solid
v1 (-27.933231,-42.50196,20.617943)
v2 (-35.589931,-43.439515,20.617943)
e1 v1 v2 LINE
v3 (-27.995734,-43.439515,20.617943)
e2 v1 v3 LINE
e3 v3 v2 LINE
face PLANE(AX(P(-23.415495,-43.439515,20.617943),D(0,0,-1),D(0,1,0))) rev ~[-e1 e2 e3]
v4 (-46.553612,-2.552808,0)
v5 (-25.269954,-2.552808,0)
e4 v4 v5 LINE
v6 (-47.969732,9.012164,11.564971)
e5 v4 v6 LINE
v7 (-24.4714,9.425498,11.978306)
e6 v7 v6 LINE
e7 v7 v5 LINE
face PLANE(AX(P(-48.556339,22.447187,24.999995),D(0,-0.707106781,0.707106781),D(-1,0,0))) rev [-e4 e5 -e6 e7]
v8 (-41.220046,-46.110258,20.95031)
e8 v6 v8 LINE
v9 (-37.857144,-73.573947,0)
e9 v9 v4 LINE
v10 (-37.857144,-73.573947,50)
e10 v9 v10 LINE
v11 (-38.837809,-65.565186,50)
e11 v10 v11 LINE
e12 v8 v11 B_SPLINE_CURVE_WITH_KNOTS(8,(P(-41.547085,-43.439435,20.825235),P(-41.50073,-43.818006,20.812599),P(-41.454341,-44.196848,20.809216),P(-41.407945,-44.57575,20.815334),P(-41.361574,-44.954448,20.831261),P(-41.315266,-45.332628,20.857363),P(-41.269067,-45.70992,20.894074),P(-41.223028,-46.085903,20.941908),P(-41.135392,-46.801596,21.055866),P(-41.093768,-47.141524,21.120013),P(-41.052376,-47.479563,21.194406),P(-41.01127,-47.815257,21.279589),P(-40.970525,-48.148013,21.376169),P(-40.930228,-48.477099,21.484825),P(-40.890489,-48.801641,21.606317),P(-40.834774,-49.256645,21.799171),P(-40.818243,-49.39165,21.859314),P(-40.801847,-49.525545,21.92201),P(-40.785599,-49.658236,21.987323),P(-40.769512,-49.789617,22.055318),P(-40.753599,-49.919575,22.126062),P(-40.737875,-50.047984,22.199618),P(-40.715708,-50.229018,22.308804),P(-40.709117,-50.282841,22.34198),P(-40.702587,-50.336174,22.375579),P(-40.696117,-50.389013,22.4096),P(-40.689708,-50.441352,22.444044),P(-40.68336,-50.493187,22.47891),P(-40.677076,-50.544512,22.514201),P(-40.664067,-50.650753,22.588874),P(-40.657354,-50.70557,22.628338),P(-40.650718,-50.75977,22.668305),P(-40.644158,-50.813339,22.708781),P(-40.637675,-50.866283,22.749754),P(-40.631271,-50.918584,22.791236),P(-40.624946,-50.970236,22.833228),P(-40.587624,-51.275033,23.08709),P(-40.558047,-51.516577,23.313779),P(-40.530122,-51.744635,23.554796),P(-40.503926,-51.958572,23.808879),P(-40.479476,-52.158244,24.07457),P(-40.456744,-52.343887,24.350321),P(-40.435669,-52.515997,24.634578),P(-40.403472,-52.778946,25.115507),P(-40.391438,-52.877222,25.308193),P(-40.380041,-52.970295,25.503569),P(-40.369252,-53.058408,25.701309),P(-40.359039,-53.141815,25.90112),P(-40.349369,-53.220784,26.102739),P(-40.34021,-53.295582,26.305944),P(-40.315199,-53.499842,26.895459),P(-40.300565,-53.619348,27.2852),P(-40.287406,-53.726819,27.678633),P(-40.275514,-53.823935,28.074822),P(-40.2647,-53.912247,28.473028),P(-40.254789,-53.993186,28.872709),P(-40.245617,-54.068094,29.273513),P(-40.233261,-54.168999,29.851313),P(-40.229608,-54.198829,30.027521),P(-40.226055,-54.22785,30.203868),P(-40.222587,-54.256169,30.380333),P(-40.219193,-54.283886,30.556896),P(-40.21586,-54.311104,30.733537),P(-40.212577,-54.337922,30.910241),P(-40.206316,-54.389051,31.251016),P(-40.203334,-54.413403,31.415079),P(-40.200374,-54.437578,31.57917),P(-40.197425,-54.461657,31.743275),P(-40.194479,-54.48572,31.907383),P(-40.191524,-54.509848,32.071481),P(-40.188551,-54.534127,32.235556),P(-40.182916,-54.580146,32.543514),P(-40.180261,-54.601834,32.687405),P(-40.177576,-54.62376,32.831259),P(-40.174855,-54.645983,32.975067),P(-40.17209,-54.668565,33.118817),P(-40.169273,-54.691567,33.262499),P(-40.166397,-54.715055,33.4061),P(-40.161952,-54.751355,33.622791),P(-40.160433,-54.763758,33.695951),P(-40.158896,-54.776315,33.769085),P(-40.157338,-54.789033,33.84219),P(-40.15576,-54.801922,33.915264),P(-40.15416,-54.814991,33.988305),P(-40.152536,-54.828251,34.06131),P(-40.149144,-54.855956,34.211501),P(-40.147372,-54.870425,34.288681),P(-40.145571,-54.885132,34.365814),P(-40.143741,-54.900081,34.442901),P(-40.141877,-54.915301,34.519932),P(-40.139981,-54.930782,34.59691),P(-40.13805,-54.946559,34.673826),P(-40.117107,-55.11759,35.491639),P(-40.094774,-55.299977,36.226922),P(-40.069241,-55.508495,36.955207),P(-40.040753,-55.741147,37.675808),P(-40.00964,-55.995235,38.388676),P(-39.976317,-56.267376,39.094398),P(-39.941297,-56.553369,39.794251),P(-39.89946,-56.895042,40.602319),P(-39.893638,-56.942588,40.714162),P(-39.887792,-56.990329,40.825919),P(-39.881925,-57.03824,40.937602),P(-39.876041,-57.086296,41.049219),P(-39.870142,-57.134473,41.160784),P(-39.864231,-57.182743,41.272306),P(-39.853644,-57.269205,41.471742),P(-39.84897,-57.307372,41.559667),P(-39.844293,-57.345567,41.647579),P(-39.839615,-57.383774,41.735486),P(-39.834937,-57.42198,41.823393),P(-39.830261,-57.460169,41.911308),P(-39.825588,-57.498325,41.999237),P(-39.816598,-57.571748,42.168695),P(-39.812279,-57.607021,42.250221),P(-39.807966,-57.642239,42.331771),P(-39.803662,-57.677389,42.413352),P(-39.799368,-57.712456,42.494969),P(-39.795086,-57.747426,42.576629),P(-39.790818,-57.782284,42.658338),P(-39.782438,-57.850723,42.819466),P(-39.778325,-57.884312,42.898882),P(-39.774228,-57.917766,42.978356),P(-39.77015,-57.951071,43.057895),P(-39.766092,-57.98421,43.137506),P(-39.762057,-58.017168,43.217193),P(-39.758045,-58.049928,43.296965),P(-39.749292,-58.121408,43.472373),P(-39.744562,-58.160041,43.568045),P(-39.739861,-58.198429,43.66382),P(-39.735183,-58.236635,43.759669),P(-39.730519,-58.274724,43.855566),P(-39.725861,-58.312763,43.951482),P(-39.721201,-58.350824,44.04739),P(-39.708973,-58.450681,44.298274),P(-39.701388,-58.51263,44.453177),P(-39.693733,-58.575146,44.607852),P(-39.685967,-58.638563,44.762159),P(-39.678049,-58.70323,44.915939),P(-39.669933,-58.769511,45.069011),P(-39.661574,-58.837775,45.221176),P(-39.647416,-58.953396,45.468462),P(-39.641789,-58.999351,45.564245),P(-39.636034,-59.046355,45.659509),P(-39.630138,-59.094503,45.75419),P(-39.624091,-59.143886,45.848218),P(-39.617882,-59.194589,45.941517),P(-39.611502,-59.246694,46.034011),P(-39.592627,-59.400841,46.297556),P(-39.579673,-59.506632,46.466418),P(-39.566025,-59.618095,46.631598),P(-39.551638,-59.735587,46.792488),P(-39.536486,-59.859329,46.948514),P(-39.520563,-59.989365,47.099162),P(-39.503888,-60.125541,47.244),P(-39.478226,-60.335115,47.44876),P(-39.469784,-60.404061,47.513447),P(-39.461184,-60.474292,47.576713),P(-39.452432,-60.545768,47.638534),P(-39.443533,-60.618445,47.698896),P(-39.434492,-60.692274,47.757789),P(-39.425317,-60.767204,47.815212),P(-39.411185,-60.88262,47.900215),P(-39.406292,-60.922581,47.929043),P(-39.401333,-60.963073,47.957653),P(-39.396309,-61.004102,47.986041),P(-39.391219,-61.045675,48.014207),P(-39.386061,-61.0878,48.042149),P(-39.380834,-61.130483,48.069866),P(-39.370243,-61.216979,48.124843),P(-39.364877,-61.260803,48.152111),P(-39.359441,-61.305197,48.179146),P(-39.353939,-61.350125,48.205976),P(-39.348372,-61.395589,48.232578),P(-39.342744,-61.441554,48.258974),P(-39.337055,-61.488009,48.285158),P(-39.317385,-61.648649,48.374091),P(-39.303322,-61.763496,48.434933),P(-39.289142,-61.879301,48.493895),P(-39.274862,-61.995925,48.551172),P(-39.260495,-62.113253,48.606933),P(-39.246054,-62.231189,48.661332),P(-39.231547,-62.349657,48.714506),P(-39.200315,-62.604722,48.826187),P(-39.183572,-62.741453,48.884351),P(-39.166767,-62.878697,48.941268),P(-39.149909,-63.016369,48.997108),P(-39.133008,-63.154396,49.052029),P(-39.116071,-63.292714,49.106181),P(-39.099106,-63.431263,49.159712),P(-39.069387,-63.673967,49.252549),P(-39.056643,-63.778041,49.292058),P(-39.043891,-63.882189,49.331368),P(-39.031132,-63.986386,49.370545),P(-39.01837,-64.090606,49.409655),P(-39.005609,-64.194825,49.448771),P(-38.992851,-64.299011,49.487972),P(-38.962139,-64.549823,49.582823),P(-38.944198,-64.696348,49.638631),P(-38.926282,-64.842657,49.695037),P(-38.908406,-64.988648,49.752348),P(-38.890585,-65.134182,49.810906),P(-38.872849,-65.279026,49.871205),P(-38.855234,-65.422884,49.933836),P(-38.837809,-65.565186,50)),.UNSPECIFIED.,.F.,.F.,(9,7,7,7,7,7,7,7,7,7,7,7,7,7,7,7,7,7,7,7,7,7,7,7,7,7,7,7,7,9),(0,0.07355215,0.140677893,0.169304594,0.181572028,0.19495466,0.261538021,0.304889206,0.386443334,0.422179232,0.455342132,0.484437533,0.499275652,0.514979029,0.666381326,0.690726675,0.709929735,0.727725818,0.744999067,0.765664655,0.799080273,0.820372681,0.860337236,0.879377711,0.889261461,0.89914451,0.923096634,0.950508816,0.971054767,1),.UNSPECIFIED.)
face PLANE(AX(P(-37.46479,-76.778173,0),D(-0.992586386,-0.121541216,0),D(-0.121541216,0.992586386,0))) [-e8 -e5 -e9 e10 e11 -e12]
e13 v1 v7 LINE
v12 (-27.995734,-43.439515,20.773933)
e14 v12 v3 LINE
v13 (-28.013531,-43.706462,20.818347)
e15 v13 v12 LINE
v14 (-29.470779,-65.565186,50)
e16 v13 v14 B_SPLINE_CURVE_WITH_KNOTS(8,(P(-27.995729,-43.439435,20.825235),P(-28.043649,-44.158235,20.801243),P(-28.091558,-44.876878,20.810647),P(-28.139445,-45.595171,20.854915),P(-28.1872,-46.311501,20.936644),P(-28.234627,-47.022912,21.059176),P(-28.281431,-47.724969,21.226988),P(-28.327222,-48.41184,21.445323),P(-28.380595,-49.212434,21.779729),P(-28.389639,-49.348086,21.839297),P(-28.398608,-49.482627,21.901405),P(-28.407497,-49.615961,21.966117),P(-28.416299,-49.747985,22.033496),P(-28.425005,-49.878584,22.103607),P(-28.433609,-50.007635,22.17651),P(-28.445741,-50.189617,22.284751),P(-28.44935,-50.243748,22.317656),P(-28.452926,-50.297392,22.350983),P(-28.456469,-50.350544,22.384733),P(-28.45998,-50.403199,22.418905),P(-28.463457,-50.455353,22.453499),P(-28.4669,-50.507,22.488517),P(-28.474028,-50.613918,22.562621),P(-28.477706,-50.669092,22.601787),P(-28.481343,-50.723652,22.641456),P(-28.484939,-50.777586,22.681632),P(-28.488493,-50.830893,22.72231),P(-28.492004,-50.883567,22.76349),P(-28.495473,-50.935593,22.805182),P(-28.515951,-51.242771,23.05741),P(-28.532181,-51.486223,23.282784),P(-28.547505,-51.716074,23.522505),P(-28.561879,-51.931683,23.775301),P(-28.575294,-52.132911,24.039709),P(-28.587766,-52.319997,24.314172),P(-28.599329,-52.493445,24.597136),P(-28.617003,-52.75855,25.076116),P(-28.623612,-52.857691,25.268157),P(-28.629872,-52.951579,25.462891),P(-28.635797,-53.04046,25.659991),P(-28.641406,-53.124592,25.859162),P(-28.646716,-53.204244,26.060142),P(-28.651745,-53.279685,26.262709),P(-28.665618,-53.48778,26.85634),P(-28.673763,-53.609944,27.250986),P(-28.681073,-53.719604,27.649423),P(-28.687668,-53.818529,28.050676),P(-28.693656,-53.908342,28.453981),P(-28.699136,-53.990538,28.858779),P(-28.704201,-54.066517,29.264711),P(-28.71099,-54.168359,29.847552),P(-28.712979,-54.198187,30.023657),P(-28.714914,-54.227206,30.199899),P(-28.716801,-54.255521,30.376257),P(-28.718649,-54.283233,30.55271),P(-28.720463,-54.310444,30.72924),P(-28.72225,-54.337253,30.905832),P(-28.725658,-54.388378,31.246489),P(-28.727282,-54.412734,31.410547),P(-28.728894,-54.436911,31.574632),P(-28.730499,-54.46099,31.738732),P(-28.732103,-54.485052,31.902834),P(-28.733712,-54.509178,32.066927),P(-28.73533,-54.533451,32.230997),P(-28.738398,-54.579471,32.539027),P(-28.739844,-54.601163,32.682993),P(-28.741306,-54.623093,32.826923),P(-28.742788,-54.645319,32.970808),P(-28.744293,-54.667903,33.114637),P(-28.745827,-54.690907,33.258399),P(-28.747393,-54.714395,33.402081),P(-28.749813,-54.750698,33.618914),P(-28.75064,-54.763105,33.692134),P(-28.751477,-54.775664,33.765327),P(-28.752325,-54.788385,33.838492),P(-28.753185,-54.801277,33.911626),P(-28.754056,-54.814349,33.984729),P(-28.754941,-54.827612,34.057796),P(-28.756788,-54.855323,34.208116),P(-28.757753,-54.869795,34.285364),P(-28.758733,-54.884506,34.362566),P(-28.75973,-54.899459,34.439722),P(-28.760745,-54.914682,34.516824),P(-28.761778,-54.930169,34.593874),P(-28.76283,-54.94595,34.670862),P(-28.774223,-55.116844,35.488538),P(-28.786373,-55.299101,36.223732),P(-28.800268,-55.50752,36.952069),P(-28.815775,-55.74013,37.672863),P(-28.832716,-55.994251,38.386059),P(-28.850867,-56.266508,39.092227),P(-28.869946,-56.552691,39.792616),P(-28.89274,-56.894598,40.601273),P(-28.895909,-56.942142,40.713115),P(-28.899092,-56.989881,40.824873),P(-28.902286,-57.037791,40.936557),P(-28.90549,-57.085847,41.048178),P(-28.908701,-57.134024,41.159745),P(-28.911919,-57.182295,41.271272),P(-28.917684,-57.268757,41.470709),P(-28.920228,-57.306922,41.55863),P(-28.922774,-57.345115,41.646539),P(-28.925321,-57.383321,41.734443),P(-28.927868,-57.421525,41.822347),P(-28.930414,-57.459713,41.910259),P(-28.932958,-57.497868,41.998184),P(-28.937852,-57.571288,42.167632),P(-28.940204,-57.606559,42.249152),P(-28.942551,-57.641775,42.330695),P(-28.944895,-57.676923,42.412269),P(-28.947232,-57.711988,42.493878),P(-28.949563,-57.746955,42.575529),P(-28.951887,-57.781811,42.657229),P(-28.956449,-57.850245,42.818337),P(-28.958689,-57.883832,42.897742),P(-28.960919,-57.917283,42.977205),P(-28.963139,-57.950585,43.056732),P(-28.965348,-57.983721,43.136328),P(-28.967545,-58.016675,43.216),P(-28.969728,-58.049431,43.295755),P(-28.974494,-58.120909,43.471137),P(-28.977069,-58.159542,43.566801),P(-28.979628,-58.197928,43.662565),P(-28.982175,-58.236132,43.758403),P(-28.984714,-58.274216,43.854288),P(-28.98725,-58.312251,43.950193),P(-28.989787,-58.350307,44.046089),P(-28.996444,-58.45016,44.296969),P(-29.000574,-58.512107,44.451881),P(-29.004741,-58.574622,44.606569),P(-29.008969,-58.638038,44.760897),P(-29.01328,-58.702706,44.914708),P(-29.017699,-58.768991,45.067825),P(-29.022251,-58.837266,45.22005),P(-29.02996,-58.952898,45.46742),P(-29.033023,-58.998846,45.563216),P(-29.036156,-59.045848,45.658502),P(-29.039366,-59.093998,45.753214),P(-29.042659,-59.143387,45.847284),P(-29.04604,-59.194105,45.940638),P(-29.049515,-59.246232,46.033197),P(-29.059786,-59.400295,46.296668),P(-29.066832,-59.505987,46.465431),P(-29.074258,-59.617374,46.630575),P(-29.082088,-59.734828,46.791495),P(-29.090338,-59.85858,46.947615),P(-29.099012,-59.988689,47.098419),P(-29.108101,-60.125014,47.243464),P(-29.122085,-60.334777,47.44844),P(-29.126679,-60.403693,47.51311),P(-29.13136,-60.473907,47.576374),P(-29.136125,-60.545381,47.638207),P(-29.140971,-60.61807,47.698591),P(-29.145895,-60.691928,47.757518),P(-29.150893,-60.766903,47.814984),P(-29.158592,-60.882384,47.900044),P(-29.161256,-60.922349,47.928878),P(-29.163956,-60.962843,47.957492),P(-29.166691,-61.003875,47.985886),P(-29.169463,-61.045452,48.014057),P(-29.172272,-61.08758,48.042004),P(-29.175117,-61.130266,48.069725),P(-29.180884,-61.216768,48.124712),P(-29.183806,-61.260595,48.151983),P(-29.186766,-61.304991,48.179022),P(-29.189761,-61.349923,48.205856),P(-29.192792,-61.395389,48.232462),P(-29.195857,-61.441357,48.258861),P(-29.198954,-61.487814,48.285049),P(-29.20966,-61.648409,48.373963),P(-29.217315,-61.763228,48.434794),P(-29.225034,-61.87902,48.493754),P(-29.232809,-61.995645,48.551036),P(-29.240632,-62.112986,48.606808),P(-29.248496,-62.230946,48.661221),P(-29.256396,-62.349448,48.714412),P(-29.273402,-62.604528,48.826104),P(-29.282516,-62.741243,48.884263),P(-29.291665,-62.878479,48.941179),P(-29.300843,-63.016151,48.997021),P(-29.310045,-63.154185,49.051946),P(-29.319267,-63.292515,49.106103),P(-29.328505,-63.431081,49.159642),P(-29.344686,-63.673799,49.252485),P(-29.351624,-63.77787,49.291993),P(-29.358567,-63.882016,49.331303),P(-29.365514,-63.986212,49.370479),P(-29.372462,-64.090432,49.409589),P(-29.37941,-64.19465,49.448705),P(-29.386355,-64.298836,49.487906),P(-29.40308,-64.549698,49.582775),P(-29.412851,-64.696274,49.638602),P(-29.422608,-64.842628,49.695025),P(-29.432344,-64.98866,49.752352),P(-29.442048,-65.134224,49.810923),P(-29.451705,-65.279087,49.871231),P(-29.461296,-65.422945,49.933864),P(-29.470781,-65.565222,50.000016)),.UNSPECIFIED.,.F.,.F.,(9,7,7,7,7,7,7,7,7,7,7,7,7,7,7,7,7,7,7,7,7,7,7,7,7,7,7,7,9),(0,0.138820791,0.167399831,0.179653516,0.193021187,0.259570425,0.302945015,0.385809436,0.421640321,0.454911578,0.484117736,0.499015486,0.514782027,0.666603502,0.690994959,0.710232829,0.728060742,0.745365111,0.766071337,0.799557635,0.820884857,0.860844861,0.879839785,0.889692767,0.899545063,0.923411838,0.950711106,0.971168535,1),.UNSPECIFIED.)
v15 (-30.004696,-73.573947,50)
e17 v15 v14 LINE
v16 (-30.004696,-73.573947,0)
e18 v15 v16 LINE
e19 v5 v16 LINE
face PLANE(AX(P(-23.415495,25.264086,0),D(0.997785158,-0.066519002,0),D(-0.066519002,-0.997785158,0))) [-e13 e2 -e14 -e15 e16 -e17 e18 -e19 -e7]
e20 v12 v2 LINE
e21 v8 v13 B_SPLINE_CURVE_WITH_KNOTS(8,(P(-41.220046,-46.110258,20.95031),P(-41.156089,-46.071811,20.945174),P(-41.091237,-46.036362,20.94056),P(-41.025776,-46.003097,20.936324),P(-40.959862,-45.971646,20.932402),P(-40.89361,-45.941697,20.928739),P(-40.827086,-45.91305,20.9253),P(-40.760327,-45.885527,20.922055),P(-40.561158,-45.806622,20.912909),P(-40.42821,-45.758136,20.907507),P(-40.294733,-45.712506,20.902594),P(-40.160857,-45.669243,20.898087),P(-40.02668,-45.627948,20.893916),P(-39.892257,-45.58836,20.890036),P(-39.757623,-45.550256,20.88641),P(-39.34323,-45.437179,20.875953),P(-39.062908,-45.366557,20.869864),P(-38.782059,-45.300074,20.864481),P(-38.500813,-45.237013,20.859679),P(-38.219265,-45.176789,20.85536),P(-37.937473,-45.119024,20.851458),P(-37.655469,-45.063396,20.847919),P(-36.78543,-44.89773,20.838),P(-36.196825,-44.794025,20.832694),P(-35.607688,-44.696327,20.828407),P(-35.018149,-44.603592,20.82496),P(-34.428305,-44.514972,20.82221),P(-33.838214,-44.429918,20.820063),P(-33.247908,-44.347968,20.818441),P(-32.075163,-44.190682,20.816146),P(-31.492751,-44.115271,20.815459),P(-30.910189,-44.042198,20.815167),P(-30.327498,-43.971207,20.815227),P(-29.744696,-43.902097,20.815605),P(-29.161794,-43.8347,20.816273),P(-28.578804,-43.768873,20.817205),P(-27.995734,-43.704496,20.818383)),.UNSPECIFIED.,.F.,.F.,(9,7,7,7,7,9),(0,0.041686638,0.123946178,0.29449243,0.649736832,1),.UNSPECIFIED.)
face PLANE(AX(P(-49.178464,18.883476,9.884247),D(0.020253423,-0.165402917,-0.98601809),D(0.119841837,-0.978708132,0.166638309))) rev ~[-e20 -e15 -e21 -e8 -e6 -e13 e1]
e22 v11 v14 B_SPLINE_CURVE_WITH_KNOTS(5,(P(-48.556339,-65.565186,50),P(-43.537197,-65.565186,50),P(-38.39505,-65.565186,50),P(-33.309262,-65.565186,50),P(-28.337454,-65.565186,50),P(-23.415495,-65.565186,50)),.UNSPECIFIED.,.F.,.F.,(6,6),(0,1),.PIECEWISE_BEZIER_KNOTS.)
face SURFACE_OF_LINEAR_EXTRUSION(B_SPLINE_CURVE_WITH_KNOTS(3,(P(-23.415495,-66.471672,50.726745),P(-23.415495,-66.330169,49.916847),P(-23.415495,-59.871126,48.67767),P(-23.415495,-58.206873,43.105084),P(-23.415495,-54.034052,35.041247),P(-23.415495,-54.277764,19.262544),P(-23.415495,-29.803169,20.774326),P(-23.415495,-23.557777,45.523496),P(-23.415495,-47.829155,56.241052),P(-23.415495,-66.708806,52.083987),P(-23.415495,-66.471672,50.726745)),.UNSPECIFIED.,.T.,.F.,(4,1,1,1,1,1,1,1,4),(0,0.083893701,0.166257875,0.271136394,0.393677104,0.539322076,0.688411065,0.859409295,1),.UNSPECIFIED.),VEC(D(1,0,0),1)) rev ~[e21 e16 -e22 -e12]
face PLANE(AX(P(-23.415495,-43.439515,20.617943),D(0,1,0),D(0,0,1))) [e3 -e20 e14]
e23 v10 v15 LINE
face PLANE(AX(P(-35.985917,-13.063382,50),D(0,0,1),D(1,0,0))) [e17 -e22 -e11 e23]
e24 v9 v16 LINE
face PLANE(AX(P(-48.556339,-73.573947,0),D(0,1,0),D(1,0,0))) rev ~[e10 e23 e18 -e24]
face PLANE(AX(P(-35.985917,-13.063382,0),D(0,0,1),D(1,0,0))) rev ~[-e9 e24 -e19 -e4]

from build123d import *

# Parameters (mm, degrees)
F0_W      = 25.1408442855
F0_H      = 121.0211291909
F1_DEPTH  = 50
F2_SIZE   = 49.99999
F3_W      = 91.4516113698
F3_H      = 29.3820567429
F4_DEPTH  = 26
F7_DEPTH  = 26
F9_DEPTH  = 50
F11_DEPTH = 55
F13_DEPTH = 25


# Not quite as in the source:
# - a fillet or chamfer is up to 0.001 mm smaller than in the source, because OpenCascade refuses the exact size


with BuildPart() as f1:
    # F0 (on Top) → F1 (new body)
    with BuildSketch(Plane.XY):
        with Locations((-35.985916853, -13.0633823574)):
            Rectangle(F0_W, F0_H)
    extrude(amount=F1_DEPTH)

    # F2 (size 50 in the source; OpenCascade refuses exactly that, so slightly less here)
    f2_edges = [f1.edges().sort_by_distance(p)[0] for p in [
        (-35.985917, 47.447182, 0),
    ]]
    chamfer(f2_edges, length=F2_SIZE)

    # F3 (on face) → F4 (cut)
    with BuildSketch(Plane.YZ.offset(-23.4154947102)):
        with Locations((2.2862907499, 35.3089716285)):
            Rectangle(F3_W, F3_H)
    extrude(amount=-F4_DEPTH, mode=Mode.SUBTRACT)

    # F6 (on face) → F7 (cut)
    with BuildSketch(Plane.YZ.offset(-23.4154947102)):
        with BuildLine():
            add(Edge.make_bspline(
                [(-66.471672154, 50.7267448454), (-66.3301689203, 49.9168473843), (-59.8711260209, 48.6776696356), (-58.2068726445, 43.1050844178), (-54.0340520057, 35.0412473829), (-54.2777638398, 19.262544423), (-29.8031687904, 20.774326267), (-23.5577770812, 45.5234958201), (-47.8291550907, 56.2410515184), (-66.7088060402, 52.0839868491), (-66.471672154, 50.7267448454)],
                knots=[0, 0, 0, 0, 0.0838937014, 0.1662578753, 0.2711363939, 0.393677104, 0.5393220763, 0.6884110648, 0.8594092945, 1, 1, 1, 1], degree=3))
        make_face()
    extrude(amount=-F7_DEPTH, mode=Mode.SUBTRACT)

    # F8 (on Top) → F9 (cut)
    with BuildSketch(Plane.XY):
        Polygon((-37.4647900462, -76.7781734467), (-49.2957793176, 19.8415517807), (-59.1298444312, -76.7781734467), align=None)
    extrude(amount=F9_DEPTH, mode=Mode.SUBTRACT)

    # F10 (on Top) → F11 (cut)
    with BuildSketch(Plane.XY):
        Polygon((-11.8309855461, -74.559867382), (-23.4154947102, 25.2640862018), (-30.0704240799, -74.559867382), align=None)
    extrude(amount=F11_DEPTH, mode=Mode.SUBTRACT)

    # F12 (on face) → F13 (cut)
    with BuildSketch(Plane(origin=(-46.1738809914, -5.6539458102, 0), x_dir=(0.1215412158, -0.9925863856, 0), z_dir=(-0.9925863856, -0.1215412158, 0))):
        Polygon((-24.7206917847, 26.6503777788), (-24.7206917847, 9.8842468545), (40.7590243896, 20.9504020134), align=None)
    extrude(amount=-F13_DEPTH, mode=Mode.SUBTRACT)


solid = f1.part
